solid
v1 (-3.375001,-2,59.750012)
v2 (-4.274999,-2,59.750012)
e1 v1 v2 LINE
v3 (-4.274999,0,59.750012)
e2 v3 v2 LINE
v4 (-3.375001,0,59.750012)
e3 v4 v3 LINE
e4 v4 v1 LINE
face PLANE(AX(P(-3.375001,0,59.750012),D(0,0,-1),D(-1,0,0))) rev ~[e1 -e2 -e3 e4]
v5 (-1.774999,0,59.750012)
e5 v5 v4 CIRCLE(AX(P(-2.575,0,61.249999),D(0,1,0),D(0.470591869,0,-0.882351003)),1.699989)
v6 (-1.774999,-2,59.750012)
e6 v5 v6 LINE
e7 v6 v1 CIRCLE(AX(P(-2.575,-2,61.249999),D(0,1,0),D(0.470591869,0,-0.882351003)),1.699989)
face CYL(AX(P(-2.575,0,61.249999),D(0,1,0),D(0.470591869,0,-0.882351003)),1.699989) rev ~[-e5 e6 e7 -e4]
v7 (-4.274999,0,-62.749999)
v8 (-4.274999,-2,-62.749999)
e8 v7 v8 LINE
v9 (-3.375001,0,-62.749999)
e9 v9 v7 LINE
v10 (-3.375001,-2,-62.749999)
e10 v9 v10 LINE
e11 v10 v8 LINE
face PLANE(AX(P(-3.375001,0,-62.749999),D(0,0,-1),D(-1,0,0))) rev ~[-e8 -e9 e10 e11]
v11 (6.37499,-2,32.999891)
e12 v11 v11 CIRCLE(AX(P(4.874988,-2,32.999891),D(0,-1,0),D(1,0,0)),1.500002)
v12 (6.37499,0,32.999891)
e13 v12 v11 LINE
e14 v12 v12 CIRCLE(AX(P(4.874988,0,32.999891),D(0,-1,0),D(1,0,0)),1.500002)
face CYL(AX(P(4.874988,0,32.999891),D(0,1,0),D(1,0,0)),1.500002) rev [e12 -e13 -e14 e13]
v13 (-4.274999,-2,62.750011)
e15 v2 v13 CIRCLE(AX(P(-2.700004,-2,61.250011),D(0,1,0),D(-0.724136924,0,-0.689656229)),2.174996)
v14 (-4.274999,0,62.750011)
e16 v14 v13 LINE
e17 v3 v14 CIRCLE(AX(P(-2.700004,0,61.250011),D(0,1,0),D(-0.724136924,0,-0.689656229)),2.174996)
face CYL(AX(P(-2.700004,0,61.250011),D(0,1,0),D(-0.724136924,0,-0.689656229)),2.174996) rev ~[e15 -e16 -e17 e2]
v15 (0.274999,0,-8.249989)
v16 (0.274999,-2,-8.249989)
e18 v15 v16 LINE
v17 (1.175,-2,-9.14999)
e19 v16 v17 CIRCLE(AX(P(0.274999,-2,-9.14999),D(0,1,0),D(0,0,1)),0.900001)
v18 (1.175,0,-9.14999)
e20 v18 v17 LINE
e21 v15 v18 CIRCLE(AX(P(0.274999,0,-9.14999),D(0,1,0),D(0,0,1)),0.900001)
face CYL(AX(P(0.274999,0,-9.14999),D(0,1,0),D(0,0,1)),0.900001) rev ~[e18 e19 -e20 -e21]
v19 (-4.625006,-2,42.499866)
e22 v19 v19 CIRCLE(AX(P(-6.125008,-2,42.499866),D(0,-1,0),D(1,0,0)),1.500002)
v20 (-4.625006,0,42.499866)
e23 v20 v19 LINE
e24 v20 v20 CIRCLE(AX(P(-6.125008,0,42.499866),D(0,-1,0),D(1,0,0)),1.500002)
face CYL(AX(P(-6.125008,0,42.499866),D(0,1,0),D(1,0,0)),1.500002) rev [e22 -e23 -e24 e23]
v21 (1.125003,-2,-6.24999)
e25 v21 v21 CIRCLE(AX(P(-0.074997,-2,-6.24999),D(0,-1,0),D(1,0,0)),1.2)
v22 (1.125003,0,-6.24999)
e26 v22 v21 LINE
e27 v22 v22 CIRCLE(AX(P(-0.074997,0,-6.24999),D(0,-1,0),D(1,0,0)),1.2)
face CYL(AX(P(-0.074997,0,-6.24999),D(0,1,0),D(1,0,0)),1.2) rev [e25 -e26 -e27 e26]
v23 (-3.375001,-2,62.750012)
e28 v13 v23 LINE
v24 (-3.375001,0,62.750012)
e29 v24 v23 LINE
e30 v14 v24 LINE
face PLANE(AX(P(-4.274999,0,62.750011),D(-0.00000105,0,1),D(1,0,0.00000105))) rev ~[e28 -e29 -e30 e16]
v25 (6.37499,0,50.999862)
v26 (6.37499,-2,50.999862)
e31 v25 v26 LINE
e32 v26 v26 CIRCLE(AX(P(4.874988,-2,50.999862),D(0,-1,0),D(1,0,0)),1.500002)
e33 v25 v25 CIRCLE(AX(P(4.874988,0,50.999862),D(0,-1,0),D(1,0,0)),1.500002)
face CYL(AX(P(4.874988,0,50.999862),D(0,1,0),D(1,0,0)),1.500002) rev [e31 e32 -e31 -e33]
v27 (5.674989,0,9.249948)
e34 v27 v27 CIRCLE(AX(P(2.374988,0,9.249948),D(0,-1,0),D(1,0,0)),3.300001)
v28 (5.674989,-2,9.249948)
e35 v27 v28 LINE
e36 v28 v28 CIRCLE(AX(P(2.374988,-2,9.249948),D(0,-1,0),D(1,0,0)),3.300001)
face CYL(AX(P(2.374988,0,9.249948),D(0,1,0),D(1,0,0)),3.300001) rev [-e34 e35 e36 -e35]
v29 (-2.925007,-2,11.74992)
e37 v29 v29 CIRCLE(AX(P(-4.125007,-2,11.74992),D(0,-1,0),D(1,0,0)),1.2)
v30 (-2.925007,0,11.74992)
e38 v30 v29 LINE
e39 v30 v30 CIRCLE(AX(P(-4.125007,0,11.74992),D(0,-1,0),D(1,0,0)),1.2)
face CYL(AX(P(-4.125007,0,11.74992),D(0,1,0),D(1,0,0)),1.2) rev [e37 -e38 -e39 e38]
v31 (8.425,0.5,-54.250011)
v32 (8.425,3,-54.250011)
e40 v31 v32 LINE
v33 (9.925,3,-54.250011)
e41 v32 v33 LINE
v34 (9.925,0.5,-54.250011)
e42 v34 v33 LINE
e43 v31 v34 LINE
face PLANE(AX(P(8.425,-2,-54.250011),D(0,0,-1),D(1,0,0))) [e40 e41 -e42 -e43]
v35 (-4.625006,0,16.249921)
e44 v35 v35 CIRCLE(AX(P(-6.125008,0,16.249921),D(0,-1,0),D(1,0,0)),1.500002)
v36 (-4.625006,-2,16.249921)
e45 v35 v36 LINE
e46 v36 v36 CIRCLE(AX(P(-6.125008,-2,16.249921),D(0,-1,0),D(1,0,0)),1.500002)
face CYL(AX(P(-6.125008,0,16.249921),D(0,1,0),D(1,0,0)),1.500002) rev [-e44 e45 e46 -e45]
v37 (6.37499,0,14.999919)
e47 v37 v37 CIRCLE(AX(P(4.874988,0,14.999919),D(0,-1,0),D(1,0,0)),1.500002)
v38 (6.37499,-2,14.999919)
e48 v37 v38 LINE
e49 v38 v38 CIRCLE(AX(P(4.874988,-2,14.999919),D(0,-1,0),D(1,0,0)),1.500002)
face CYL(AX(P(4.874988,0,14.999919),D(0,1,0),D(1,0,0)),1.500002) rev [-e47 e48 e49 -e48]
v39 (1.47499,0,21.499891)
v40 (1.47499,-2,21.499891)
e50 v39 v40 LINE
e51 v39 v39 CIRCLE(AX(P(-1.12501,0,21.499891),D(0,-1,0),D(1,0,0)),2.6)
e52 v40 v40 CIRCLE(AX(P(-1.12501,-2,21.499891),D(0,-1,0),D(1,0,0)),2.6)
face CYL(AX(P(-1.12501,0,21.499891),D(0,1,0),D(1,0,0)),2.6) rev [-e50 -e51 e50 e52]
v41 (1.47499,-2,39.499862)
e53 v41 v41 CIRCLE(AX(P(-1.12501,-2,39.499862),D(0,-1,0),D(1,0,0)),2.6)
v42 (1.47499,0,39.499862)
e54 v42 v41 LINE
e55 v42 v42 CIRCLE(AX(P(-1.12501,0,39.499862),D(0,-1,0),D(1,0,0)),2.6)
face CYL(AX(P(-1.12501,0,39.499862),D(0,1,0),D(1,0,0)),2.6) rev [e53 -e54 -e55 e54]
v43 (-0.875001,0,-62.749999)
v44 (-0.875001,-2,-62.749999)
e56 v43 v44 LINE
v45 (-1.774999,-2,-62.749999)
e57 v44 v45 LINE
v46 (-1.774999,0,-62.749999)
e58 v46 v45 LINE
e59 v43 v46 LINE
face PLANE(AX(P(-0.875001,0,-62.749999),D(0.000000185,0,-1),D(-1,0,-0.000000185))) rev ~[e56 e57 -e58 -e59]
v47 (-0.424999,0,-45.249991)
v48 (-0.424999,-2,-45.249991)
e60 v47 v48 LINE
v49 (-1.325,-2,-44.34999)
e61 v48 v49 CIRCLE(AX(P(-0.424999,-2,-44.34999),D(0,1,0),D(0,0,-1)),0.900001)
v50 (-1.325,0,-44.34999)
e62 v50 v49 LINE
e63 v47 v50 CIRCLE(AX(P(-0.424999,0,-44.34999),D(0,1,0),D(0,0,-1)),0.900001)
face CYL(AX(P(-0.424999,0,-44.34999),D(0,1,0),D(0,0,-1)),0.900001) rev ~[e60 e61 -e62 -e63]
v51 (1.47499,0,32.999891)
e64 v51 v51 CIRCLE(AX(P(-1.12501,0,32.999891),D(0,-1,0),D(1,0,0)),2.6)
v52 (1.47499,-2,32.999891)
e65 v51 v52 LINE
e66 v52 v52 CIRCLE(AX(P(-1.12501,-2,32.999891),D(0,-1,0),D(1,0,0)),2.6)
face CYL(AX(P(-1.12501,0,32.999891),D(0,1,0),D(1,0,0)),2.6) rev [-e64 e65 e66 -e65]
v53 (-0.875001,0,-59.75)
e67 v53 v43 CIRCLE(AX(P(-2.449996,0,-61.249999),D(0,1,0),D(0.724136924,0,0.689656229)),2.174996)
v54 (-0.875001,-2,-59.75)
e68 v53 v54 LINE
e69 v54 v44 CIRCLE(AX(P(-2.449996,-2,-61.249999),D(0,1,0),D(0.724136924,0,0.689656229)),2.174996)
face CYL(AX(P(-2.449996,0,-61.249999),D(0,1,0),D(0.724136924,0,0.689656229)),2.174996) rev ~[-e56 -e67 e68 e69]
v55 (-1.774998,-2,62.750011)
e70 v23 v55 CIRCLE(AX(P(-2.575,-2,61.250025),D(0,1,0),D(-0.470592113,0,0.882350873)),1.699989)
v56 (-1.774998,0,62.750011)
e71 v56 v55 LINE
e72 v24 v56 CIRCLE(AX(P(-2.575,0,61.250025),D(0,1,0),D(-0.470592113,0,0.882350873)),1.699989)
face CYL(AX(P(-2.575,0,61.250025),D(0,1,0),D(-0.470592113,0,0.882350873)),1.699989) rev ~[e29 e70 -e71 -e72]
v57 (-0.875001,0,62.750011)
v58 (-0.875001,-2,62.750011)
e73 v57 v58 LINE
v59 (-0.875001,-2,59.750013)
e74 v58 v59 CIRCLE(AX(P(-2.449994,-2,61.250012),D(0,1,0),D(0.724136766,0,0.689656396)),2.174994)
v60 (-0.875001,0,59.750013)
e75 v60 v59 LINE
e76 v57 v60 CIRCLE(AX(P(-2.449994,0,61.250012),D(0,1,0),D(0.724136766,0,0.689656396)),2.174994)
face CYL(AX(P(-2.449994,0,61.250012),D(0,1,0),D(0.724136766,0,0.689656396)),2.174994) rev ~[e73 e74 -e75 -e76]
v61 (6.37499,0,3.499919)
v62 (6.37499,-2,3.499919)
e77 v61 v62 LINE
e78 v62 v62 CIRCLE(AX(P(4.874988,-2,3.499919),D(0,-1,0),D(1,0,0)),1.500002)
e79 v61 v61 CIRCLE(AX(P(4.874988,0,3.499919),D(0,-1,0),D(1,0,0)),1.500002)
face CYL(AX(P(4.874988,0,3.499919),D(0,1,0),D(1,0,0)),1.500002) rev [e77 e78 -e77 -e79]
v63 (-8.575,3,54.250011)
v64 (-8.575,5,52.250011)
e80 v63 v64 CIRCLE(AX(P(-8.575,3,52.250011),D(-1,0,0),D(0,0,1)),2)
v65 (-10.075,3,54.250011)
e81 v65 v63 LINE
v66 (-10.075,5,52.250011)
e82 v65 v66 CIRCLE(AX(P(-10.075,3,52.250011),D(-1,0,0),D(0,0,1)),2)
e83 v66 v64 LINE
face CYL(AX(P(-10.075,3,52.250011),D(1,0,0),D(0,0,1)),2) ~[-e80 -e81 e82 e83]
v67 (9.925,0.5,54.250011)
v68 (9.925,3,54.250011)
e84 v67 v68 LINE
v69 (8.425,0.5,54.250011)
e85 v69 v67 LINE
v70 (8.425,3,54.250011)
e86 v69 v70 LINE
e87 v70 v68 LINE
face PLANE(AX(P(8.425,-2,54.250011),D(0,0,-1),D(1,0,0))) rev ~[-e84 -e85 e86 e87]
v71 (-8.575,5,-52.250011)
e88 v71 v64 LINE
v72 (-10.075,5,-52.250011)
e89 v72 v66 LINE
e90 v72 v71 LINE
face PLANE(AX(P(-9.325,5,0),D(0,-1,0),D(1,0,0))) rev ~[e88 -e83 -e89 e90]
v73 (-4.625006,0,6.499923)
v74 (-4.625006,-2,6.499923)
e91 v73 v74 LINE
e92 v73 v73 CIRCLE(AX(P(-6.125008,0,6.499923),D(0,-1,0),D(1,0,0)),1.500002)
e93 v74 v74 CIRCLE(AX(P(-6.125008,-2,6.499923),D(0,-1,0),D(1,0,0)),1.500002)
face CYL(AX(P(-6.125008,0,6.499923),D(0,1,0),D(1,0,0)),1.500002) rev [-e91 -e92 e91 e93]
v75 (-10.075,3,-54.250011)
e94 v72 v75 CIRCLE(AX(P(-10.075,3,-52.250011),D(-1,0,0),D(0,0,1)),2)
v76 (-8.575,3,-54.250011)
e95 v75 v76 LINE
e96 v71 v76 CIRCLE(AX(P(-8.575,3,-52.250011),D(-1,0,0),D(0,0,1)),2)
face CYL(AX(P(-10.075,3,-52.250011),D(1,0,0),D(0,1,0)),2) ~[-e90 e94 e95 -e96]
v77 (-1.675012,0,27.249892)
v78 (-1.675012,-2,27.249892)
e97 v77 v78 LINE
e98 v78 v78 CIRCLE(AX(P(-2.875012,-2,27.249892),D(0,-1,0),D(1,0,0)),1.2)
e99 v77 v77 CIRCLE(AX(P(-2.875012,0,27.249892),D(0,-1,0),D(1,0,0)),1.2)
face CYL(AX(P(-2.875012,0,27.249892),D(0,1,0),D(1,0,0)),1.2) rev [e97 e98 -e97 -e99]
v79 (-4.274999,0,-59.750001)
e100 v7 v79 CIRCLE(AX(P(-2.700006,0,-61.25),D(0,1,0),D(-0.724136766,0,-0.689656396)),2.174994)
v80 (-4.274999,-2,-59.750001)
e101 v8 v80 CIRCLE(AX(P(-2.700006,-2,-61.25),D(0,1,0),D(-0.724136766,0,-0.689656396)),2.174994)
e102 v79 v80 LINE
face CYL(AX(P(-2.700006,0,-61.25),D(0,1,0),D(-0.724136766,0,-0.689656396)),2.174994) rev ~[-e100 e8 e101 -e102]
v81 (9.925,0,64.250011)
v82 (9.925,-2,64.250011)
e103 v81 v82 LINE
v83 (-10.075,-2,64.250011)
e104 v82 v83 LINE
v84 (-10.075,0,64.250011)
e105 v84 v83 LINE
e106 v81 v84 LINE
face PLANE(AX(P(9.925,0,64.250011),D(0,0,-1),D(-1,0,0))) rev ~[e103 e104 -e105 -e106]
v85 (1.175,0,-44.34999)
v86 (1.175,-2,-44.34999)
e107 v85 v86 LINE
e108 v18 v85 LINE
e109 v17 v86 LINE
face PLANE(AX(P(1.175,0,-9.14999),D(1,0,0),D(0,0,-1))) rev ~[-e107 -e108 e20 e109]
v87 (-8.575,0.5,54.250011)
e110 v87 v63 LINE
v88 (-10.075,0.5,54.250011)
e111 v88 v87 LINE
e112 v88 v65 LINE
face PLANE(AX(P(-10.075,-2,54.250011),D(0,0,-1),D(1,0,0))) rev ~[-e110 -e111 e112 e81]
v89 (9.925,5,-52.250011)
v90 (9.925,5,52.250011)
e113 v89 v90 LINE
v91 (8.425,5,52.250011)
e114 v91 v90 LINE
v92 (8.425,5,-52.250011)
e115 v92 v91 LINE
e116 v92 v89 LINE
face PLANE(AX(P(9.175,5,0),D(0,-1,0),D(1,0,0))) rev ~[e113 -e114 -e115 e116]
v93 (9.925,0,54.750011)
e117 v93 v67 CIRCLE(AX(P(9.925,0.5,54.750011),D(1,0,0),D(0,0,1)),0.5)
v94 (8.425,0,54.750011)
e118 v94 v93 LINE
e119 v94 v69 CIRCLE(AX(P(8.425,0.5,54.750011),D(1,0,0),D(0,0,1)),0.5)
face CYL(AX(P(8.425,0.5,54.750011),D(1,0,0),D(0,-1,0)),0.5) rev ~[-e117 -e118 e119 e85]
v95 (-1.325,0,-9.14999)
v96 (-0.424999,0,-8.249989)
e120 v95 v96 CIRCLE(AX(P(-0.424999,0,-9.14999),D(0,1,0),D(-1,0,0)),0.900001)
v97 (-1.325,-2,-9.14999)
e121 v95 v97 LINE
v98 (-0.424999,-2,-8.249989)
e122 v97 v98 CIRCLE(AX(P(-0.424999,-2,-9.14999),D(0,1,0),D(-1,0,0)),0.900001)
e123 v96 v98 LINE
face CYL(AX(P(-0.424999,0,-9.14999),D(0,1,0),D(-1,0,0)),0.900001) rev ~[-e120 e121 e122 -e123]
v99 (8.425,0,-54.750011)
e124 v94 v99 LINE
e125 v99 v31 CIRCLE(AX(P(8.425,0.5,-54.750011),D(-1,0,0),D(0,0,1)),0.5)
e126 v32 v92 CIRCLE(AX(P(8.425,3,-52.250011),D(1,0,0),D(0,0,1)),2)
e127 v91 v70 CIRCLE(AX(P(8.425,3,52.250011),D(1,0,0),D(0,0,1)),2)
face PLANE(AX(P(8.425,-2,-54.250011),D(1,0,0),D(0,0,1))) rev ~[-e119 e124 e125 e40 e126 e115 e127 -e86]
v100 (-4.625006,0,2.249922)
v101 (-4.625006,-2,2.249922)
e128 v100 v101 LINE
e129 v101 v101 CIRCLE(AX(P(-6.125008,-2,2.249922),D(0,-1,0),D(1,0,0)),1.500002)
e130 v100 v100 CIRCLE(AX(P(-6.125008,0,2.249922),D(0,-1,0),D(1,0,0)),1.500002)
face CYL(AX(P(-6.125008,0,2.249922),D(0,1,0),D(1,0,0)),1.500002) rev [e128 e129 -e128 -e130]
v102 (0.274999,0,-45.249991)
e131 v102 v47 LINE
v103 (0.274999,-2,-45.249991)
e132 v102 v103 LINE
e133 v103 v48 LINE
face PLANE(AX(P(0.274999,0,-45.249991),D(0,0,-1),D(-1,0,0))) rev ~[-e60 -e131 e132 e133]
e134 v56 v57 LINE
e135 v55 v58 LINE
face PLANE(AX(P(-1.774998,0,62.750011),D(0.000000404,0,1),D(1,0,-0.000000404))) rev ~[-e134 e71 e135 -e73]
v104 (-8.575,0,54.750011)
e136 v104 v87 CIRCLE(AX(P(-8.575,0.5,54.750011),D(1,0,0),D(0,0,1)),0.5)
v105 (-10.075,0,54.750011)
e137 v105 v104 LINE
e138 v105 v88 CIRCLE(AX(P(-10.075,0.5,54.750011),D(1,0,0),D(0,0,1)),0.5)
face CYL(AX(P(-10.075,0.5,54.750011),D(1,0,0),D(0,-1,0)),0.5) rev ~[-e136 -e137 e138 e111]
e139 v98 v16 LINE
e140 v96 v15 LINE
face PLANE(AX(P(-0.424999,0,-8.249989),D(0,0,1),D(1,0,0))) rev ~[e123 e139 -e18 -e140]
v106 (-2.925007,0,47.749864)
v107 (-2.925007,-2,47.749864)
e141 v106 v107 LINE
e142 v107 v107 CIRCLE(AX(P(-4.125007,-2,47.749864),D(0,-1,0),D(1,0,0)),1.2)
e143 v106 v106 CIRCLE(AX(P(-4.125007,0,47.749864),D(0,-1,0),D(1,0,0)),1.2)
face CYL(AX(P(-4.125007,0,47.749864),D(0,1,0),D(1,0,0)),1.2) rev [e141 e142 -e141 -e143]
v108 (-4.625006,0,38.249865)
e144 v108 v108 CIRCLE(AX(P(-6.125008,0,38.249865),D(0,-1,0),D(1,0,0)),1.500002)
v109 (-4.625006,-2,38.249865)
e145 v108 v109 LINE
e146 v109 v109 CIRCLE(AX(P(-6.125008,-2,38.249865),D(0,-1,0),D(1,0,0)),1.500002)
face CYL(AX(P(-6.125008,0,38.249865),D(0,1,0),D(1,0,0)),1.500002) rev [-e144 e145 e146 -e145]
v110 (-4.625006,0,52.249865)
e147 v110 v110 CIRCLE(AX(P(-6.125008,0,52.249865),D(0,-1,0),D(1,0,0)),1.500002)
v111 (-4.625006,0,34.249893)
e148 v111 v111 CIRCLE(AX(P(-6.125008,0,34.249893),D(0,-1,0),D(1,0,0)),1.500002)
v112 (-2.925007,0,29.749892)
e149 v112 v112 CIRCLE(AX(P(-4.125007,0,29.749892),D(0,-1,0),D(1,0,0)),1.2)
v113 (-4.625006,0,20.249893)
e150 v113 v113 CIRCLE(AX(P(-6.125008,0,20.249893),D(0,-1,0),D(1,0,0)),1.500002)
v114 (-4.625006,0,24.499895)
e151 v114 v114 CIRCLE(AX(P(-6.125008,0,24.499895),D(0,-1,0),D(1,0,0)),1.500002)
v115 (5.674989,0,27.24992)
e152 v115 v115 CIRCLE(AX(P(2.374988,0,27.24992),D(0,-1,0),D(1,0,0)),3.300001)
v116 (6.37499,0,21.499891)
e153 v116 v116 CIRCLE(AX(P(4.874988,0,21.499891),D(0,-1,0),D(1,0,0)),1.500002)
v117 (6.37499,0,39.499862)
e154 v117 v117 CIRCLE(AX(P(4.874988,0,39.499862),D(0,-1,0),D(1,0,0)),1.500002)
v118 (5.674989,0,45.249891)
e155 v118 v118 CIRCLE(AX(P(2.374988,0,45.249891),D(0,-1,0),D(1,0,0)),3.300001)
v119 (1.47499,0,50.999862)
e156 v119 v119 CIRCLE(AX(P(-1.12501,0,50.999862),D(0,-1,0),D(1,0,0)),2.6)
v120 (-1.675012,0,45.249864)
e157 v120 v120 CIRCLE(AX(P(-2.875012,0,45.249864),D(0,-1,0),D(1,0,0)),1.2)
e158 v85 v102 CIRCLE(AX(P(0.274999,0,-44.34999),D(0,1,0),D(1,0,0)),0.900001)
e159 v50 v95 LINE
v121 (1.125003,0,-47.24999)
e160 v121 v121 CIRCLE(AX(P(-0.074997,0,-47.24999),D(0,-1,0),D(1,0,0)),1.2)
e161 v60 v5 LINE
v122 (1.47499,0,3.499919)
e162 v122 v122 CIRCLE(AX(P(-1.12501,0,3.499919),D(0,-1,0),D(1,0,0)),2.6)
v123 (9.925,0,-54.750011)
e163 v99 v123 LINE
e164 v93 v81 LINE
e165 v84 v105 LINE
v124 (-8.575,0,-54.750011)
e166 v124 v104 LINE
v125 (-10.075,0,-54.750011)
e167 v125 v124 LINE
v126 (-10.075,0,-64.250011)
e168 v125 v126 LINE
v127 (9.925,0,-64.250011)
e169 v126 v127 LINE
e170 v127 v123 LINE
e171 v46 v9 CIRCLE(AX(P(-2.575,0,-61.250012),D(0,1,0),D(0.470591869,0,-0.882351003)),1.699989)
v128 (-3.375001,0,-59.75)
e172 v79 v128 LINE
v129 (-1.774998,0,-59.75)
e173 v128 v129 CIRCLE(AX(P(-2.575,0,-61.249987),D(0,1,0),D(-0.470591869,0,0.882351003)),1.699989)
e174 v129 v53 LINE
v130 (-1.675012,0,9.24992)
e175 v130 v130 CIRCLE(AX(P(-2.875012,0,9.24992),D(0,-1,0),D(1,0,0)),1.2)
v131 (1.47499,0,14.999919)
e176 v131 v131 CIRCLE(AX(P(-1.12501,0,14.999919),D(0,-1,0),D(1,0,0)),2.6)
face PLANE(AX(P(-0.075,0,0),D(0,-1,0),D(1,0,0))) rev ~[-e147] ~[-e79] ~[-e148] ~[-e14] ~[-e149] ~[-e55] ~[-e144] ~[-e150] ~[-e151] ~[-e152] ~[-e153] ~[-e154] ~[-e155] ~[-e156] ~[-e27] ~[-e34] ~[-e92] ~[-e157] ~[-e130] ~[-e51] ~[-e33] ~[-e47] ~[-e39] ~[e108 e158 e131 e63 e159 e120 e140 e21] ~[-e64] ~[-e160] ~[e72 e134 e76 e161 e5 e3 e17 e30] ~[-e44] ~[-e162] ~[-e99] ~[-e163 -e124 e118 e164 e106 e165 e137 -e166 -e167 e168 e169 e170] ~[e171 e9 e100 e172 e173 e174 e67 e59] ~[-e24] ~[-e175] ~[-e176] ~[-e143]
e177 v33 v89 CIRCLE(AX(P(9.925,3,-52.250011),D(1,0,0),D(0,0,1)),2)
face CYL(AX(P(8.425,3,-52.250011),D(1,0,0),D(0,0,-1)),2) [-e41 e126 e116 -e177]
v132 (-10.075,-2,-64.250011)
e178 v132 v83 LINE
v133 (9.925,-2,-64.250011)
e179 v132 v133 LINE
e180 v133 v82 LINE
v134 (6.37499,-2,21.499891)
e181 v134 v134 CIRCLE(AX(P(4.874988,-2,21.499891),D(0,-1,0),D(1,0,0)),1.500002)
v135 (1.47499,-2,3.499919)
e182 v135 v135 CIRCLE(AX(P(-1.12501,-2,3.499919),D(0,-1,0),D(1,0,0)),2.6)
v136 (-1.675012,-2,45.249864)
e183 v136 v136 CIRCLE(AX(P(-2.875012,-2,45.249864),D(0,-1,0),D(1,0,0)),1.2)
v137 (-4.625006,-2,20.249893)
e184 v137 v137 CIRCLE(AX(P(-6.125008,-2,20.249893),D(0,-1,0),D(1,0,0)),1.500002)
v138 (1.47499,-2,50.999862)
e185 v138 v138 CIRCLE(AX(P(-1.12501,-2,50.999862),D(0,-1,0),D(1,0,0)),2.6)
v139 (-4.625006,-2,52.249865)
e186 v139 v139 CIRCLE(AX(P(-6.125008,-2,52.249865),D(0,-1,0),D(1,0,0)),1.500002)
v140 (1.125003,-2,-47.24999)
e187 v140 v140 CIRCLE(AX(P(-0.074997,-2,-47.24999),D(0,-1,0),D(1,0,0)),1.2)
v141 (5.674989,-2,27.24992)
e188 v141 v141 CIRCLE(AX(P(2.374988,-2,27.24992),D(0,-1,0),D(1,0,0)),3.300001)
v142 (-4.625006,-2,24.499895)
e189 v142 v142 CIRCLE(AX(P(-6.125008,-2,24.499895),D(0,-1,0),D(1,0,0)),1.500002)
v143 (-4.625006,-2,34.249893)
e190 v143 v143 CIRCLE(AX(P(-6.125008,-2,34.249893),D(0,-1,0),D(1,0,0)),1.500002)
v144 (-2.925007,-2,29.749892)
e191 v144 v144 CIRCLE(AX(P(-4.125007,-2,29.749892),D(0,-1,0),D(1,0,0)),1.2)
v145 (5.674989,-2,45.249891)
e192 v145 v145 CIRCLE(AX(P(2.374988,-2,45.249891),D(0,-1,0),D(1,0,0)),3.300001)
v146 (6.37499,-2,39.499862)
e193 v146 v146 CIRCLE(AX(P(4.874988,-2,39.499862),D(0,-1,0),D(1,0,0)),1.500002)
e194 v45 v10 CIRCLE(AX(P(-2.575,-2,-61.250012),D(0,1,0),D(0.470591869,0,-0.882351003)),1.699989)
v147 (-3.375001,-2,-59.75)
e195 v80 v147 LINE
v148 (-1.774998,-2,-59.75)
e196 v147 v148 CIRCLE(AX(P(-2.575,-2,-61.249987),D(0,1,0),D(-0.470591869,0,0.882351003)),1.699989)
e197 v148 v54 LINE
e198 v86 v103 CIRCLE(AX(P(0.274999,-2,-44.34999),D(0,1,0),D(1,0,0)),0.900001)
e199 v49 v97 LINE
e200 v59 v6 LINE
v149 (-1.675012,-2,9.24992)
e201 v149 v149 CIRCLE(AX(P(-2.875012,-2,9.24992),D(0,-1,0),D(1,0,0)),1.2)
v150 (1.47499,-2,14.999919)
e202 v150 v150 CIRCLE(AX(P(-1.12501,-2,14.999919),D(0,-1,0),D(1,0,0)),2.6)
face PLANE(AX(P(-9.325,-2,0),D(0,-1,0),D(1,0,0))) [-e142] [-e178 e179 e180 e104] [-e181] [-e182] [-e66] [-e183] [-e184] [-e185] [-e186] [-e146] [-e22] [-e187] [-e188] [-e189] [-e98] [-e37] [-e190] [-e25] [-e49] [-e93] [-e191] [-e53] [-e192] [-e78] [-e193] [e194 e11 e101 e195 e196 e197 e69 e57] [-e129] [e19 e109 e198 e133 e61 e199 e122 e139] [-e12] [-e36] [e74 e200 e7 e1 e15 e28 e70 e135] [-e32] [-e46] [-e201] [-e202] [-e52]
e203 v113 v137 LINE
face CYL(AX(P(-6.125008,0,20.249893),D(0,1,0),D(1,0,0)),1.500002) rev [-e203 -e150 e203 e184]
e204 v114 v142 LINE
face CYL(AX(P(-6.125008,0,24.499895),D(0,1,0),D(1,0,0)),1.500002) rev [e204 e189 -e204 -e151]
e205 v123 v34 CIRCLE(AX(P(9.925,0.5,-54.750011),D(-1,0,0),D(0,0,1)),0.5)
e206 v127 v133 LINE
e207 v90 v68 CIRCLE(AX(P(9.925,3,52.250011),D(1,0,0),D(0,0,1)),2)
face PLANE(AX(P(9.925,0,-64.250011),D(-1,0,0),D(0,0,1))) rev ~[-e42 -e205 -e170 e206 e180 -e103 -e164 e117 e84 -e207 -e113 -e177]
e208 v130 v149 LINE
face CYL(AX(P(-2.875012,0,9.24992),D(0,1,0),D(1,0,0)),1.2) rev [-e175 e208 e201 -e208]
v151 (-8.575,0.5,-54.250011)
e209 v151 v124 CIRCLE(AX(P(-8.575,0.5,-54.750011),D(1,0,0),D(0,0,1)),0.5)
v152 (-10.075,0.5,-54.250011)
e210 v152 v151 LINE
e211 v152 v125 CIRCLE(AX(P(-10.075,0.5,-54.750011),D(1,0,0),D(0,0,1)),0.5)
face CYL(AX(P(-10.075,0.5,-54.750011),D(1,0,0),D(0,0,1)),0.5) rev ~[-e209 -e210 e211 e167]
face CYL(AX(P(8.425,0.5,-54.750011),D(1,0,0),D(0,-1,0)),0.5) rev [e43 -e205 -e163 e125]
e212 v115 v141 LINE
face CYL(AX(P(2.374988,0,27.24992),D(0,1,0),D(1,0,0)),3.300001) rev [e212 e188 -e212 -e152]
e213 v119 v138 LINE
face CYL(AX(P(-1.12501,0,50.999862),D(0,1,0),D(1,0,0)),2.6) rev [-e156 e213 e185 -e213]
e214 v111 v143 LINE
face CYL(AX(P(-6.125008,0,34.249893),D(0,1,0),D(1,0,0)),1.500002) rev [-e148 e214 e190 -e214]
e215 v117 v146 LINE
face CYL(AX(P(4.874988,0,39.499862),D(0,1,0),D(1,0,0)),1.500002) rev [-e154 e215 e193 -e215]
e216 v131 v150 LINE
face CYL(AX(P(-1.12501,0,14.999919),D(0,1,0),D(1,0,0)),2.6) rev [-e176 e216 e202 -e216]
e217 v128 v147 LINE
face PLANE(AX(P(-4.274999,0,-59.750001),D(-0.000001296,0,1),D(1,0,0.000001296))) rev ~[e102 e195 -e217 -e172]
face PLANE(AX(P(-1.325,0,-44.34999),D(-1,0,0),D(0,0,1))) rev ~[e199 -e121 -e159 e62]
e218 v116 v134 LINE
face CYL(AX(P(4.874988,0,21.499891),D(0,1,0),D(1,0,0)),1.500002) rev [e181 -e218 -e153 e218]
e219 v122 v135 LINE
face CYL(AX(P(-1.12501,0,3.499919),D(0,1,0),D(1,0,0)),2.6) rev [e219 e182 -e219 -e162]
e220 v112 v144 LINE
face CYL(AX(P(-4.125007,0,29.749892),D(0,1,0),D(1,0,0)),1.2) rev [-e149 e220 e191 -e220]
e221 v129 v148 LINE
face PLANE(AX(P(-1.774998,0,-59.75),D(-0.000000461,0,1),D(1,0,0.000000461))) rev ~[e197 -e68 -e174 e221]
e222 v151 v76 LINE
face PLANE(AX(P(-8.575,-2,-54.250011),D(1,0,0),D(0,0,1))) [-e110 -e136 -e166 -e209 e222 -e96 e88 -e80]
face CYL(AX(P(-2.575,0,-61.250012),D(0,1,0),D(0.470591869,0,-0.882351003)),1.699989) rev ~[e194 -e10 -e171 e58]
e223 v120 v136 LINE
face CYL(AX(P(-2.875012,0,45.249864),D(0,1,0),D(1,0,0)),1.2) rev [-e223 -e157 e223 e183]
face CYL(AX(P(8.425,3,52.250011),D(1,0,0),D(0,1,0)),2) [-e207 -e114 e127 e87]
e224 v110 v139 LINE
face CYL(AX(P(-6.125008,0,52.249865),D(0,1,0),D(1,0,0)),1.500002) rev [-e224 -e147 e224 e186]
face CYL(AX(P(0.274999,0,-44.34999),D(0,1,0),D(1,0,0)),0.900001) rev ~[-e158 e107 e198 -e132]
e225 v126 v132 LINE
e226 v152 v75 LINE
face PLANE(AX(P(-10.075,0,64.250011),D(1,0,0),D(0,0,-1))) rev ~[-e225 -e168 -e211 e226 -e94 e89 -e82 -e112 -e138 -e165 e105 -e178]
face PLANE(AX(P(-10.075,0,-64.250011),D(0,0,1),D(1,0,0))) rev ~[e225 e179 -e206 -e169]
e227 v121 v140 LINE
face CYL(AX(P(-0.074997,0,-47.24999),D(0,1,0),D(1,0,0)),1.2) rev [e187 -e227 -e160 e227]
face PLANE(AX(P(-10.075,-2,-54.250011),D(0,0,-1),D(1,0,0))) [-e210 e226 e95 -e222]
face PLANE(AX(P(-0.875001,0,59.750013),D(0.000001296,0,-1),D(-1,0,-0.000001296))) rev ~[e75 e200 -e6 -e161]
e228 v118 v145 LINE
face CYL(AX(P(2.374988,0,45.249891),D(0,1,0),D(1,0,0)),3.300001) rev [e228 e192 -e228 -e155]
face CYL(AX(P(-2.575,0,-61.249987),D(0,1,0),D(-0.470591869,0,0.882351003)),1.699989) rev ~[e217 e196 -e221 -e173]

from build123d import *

# Parameters (mm, degrees)
F0_R     = 1.2
F0_R_2   = 1.500002
F0_R_3   = 2.6
F0_R_4   = 3.300001
F1_DEPTH = 2
F2_W     = 1.5
F2_H     = 108.500022
F3_DEPTH = 7
F4_R     = 2
F5_R     = 0.5


# Not quite as in the source:
# - ends of sketch curves that miss each other by under 0.0002 mm in the source are joined


with BuildPart() as f1:
    # F0 (on Front) → F1 (new body)
    with BuildSketch(Plane.XZ):
        Polygon((9.925, 64.250011), (-10.075, 64.250011), (-10.075, -61.250012), (-10.075, -64.250011), (9.925, -64.250011), align=None)
        with BuildLine():
            ThreePointArc((-3.375001, -59.75), (-2.5749995588, -59.549998), (-1.7749982215, -59.7500004152))
            Line((-1.7749982215, -59.7500004152), (-0.875001, -59.75))
            ThreePointArc((-0.875001, -59.75), (-0.275, -61.25), (-0.8750011748, -62.7499988335))
            Line((-0.8750011748, -62.7499988335), (-1.774999, -62.749999))
            ThreePointArc((-1.774999, -62.749999), (-2.5749995588, -62.950001), (-3.375001, -62.749999))
            Line((-3.375001, -62.749999), (-4.274999, -62.749999))
            ThreePointArc((-4.274999, -62.749999), (-4.875, -61.25), (-4.2749988252, -59.7500011665))
            Line((-4.2749988252, -59.7500011665), (-3.375001, -59.75))
        make_face(mode=Mode.SUBTRACT)
        with Locations((-0.074997, -47.24999)):
            Circle(F0_R, mode=Mode.SUBTRACT)
        with BuildLine():
            ThreePointArc((-1.325, -9.14999), (-1.0613958102, -8.5135931898), (-0.424999, -8.249989))
            Line((-0.424999, -8.249989), (0.274999, -8.249989))
            ThreePointArc((0.274999, -8.249989), (0.9113958102, -8.5135931898), (1.175, -9.14999))
            Line((1.175, -9.14999), (1.175, -26.74999))
            Line((1.175, -26.74999), (1.175, -44.34999))
            ThreePointArc((1.175, -44.34999), (0.9113958102, -44.9863868102), (0.274999, -45.249991))
            Line((0.274999, -45.249991), (-0.424999, -45.249991))
            ThreePointArc((-0.424999, -45.249991), (-1.0613958102, -44.9863868102), (-1.325, -44.34999))
            Line((-1.325, -44.34999), (-1.325, -26.74999))
            Line((-1.325, -26.74999), (-1.325, -9.14999))
        make_face(mode=Mode.SUBTRACT)
        with Locations((-0.074997, -6.24999)):
            Circle(F0_R, mode=Mode.SUBTRACT)
        with Locations((-6.125008, 2.249922)):
            Circle(F0_R_2, mode=Mode.SUBTRACT)
        with Locations((-6.125008, 6.499923)):
            Circle(F0_R_2, mode=Mode.SUBTRACT)
        with Locations((-6.125008, 16.249921)):
            Circle(F0_R_2, mode=Mode.SUBTRACT)
        with Locations((-6.125008, 20.249893)):
            Circle(F0_R_2, mode=Mode.SUBTRACT)
        with Locations((-6.125008, 24.499895)):
            Circle(F0_R_2, mode=Mode.SUBTRACT)
        with Locations((-4.125007, 11.74992)):
            Circle(F0_R, mode=Mode.SUBTRACT)
        with Locations((-2.875012, 9.24992)):
            Circle(F0_R, mode=Mode.SUBTRACT)
        with Locations((-1.12501, 3.499919)):
            Circle(F0_R_3, mode=Mode.SUBTRACT)
        with Locations((-1.12501, 14.999919)):
            Circle(F0_R_3, mode=Mode.SUBTRACT)
        with Locations((-4.125007, 29.749892)):
            Circle(F0_R, mode=Mode.SUBTRACT)
        with Locations((-2.875012, 27.249892)):
            Circle(F0_R, mode=Mode.SUBTRACT)
        with Locations((-1.12501, 21.499891)):
            Circle(F0_R_3, mode=Mode.SUBTRACT)
        with Locations((-6.125008, 34.249893)):
            Circle(F0_R_2, mode=Mode.SUBTRACT)
        with Locations((-6.125008, 38.249865)):
            Circle(F0_R_2, mode=Mode.SUBTRACT)
        with Locations((-6.125008, 42.499866)):
            Circle(F0_R_2, mode=Mode.SUBTRACT)
        with Locations((-6.125008, 52.249865)):
            Circle(F0_R_2, mode=Mode.SUBTRACT)
        with Locations((-4.125007, 47.749864)):
            Circle(F0_R, mode=Mode.SUBTRACT)
        with Locations((-2.875012, 45.249864)):
            Circle(F0_R, mode=Mode.SUBTRACT)
        with Locations((-1.12501, 32.999891)):
            Circle(F0_R_3, mode=Mode.SUBTRACT)
        with Locations((-1.12501, 39.499862)):
            Circle(F0_R_3, mode=Mode.SUBTRACT)
        with Locations((-1.12501, 50.999862)):
            Circle(F0_R_3, mode=Mode.SUBTRACT)
        with BuildLine():
            ThreePointArc((-3.3750014152, 62.7500117785), (-2.5749995588, 62.950014), (-1.7749978062, 62.7500113633))
            Line((-1.7749978062, 62.7500113633), (-0.875001, 62.750011))
            ThreePointArc((-0.875001, 62.750011), (-0.275, 61.250012), (-0.8750011748, 59.7500131665))
            Line((-0.8750011748, 59.7500131665), (-1.774999, 59.750012))
            ThreePointArc((-1.774999, 59.750012), (-2.5749995588, 59.55001), (-3.375001, 59.750012))
            Line((-3.375001, 59.750012), (-4.274999, 59.750012))
            ThreePointArc((-4.274999, 59.750012), (-4.875, 61.250012), (-4.2749988252, 62.7500108335))
            Line((-4.2749988252, 62.7500108335), (-3.3750014152, 62.7500117785))
        make_face(mode=Mode.SUBTRACT)
        with Locations((2.374988, 9.249948)):
            Circle(F0_R_4, mode=Mode.SUBTRACT)
        with Locations((4.874988, 3.499919)):
            Circle(F0_R_2, mode=Mode.SUBTRACT)
        with Locations((4.874988, 14.999919)):
            Circle(F0_R_2, mode=Mode.SUBTRACT)
        with Locations((2.374988, 27.24992)):
            Circle(F0_R_4, mode=Mode.SUBTRACT)
        with Locations((4.874988, 21.499891)):
            Circle(F0_R_2, mode=Mode.SUBTRACT)
        with Locations((2.374988, 45.249891)):
            Circle(F0_R_4, mode=Mode.SUBTRACT)
        with Locations((4.874988, 32.999891)):
            Circle(F0_R_2, mode=Mode.SUBTRACT)
        with Locations((4.874988, 39.499862)):
            Circle(F0_R_2, mode=Mode.SUBTRACT)
        with Locations((4.874988, 50.999862)):
            Circle(F0_R_2, mode=Mode.SUBTRACT)
    extrude(amount=F1_DEPTH)

    # F2 (on face) → F3 (join)
    with BuildSketch(Plane.XZ.offset(2)):
        with Locations((-9.325, 0)):
            Rectangle(F2_W, F2_H)
        with Locations((9.175, 0)):
            Rectangle(F2_W, F2_H)
    extrude(amount=-F3_DEPTH)

    # F4
    f4_edges = [f1.edges().sort_by_distance(p)[0] for p in [
        (-9.325, 5, 54.250011),
        (9.175, 5, 54.250011),
        (-9.325, 5, -54.250011),
        (9.175, 5, -54.250011),
    ]]
    fillet(f4_edges, radius=F4_R)

    # F5
    f5_edges = [f1.edges().sort_by_distance(p)[0] for p in [
        (9.175, 0, -54.250011),
        (-9.325, 0, -54.250011),
        (9.175, 0, 54.250011),
        (-9.325, 0, 54.250011),
    ]]
    fillet(f5_edges, radius=F5_R)


solid = f1.part
